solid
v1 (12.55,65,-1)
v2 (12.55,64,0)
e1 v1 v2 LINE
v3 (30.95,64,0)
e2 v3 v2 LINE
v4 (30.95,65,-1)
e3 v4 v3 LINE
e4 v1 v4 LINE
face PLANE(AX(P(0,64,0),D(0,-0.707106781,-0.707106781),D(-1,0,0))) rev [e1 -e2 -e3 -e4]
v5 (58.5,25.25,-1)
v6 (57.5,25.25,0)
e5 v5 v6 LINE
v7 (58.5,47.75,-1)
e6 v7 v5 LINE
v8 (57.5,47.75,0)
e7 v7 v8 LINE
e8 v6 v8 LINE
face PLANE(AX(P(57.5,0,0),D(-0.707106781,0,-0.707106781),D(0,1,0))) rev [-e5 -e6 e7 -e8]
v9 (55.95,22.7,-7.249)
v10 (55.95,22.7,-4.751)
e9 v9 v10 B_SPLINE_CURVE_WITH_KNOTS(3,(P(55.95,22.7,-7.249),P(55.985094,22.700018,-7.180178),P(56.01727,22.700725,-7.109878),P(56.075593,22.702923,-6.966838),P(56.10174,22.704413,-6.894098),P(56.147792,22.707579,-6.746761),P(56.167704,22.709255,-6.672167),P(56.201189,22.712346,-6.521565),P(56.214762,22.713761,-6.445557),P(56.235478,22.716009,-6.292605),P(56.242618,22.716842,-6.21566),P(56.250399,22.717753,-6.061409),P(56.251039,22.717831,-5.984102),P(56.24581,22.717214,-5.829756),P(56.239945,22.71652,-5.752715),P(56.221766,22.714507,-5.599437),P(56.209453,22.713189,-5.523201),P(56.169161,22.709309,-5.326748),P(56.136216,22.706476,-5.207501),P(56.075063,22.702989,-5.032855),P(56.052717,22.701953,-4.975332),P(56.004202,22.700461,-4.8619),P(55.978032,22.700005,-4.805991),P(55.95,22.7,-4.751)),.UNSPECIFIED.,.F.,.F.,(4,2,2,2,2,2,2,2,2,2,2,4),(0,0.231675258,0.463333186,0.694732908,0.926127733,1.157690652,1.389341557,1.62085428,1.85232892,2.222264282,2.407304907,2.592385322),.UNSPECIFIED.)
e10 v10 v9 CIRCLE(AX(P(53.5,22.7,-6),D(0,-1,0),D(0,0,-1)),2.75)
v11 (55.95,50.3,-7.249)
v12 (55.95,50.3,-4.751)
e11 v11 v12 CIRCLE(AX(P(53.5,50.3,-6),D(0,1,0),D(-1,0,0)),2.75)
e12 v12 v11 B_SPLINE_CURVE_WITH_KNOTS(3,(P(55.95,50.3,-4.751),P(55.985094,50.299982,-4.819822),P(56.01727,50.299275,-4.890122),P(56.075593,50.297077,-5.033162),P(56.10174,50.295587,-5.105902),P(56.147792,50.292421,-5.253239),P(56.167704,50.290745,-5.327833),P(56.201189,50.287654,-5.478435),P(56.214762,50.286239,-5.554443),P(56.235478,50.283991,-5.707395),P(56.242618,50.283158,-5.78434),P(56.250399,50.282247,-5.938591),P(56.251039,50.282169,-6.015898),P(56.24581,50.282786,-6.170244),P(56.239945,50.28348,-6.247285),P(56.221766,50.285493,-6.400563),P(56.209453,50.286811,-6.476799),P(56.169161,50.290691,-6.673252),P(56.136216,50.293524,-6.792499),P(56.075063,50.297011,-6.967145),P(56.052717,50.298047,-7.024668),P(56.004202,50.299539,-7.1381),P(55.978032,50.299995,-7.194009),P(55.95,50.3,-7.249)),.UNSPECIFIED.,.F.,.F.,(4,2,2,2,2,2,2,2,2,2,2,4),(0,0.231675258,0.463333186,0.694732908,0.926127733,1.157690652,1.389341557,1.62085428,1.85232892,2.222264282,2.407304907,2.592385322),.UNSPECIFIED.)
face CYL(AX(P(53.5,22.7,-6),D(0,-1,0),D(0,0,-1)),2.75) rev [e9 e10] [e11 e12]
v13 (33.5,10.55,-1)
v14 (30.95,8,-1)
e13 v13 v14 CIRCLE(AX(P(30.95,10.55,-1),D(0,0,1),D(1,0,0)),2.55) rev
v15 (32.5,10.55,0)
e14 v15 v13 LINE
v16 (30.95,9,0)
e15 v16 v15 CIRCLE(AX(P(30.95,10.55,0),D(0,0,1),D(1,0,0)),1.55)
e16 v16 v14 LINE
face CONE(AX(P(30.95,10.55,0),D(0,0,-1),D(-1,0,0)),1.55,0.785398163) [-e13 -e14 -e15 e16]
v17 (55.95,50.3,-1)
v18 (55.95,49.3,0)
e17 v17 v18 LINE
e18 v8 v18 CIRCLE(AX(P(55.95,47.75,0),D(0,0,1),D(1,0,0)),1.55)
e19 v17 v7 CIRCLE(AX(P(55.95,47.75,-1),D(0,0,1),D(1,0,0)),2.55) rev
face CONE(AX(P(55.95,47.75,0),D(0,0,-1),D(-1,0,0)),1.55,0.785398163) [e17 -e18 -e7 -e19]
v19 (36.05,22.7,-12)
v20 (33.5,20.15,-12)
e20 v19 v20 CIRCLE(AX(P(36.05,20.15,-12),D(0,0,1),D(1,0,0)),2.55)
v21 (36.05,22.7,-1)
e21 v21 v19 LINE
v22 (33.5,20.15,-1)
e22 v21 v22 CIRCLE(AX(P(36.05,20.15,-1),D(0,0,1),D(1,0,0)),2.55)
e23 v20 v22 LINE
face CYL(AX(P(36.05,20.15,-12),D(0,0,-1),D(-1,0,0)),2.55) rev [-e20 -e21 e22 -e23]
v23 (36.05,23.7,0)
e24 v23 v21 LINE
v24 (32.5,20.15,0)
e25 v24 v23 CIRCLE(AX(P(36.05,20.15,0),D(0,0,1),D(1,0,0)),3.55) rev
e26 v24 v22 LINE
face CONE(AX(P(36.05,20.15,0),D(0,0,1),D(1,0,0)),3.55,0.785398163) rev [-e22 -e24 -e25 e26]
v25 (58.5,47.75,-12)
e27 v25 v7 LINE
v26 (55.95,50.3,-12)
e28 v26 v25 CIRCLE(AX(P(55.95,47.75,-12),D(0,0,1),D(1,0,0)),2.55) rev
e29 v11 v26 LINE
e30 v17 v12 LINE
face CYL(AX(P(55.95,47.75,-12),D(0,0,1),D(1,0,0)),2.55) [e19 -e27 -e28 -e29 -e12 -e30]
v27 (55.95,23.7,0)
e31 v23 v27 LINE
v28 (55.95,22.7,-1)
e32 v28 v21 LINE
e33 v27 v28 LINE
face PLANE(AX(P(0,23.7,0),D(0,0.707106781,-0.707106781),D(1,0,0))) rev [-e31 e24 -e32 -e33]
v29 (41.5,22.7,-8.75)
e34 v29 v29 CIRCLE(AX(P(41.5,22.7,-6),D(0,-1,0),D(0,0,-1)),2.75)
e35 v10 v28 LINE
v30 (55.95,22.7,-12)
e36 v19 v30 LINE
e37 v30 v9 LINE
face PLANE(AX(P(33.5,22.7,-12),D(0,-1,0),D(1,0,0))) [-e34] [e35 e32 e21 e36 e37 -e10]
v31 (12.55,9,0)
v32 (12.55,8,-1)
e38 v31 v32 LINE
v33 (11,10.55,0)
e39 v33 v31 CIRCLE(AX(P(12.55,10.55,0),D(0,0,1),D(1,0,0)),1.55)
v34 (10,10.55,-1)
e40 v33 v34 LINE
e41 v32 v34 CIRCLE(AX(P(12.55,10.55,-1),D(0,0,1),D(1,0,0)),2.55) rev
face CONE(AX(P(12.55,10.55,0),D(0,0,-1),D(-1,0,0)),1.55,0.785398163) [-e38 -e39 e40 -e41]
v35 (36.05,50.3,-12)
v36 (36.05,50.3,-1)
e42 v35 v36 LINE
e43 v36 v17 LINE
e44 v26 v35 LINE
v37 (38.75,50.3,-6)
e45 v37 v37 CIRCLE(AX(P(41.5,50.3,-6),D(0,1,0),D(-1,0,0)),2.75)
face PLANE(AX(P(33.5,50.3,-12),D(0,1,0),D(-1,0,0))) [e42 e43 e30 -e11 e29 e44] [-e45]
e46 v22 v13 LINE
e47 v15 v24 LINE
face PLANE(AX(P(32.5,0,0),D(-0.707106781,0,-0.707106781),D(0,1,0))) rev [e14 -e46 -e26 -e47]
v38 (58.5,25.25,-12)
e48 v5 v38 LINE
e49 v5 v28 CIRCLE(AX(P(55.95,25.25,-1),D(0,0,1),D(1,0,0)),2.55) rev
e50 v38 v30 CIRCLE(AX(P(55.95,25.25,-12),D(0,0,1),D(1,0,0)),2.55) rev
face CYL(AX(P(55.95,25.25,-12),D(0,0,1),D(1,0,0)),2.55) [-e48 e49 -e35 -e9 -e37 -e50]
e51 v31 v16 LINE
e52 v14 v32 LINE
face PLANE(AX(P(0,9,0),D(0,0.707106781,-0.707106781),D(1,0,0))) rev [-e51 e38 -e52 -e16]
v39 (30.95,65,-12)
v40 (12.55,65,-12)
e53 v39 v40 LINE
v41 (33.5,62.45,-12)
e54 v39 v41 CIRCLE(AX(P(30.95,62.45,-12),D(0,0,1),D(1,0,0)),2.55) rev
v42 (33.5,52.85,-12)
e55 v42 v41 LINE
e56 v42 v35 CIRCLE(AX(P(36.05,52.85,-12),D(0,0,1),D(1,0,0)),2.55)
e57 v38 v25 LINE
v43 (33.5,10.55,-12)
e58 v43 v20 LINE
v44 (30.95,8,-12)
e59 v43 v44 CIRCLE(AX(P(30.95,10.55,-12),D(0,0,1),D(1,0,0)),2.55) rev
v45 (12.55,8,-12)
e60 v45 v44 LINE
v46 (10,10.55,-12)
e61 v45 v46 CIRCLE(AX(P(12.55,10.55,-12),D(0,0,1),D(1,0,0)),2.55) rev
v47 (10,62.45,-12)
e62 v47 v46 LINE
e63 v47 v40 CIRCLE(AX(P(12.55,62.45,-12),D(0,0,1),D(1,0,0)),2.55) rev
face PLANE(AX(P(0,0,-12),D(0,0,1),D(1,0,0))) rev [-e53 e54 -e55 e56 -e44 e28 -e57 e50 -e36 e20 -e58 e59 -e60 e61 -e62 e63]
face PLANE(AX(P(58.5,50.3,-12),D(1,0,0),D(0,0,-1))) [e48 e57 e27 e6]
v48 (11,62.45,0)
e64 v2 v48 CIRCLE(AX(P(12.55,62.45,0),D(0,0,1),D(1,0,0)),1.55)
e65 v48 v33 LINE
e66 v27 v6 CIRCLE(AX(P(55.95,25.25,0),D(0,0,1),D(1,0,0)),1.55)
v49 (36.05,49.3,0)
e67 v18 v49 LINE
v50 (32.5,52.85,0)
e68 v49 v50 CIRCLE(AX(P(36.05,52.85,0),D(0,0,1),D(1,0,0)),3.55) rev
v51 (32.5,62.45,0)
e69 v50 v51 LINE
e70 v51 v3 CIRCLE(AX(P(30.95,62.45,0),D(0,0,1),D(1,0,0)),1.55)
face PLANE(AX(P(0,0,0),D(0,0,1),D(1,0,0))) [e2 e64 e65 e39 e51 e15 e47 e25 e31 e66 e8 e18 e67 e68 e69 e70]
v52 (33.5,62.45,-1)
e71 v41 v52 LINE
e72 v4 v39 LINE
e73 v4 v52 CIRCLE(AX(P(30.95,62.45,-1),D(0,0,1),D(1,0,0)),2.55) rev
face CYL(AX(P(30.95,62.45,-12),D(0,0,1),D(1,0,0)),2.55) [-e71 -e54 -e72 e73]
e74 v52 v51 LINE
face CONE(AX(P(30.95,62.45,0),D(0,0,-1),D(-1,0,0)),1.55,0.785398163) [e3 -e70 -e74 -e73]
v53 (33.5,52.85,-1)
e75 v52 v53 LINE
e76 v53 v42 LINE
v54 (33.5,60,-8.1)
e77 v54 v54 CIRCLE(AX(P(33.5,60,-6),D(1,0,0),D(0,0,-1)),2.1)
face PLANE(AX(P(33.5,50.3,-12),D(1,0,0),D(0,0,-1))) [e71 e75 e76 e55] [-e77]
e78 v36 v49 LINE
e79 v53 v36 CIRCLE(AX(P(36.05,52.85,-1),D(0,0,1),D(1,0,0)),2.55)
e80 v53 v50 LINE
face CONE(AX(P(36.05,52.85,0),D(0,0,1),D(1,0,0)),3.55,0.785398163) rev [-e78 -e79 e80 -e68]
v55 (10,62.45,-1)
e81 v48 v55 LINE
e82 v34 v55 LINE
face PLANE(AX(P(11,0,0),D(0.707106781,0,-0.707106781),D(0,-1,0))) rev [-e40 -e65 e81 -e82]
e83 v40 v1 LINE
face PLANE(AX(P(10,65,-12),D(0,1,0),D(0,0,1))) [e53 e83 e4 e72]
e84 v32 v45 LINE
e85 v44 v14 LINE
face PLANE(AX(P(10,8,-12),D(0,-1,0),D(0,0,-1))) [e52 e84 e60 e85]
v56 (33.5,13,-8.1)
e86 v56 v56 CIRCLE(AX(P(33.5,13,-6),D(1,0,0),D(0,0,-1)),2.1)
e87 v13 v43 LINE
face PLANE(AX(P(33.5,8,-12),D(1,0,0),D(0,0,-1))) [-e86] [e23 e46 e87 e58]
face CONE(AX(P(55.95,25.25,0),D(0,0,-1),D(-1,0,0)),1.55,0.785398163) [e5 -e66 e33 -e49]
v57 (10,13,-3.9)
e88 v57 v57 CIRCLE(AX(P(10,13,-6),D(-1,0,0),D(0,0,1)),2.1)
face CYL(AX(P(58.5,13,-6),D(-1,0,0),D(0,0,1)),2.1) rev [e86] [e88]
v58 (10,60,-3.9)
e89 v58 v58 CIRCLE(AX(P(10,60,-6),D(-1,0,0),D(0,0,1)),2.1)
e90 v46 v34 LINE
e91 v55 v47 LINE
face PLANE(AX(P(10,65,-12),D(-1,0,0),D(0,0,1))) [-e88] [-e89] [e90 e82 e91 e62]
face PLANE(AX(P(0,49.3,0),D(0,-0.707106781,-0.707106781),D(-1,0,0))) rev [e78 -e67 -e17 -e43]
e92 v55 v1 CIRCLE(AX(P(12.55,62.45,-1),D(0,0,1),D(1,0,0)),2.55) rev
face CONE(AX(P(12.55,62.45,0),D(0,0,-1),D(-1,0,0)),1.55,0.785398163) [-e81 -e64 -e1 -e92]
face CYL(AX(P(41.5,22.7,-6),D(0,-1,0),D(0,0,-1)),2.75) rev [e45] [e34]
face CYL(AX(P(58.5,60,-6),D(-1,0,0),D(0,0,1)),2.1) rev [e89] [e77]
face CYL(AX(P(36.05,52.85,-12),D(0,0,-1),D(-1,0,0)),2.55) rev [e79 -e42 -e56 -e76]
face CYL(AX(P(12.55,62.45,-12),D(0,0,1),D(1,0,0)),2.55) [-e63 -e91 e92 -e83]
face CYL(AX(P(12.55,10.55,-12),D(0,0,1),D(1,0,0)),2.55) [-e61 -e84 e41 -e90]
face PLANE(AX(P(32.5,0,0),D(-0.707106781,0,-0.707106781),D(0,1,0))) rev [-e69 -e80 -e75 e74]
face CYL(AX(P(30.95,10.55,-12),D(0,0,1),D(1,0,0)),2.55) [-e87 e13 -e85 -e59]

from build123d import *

# Parameters (mm, degrees)
BOSS_EXTRUDE1_DEPTH      = 12
SKETCH2_R                = 2.1
CUT_EXTRUDE1_DEPTH       = 82.983229992
M5_CLEARANCE_HOLE1_D     = 5.5
M5_CLEARANCE_HOLE1_DEPTH = 28.347633298
M5_CLEARANCE_HOLE1_TIP   = 1.652366702
FILLET1_R                = 2.55
CHAMFER1_SIZE            = 1


with BuildPart() as part:
    # Sketch1 → Boss-Extrude1 (new body)
    with BuildSketch(Plane.XY):
        Polygon((10, 65), (10, 8), (33.5, 8), (33.5, 22.7), (58.5, 22.7), (58.5, 50.3), (33.5, 50.3), (33.5, 65), align=None)
    extrude(amount=-BOSS_EXTRUDE1_DEPTH)

    # Sketch2 → Cut-Extrude1 (cut, through all)
    with BuildSketch(Plane.ZY.offset(-10)):
        with Locations((-6, 13)):
            Circle(SKETCH2_R)
        with Locations((-6, 60)):
            Circle(SKETCH2_R)
    extrude(amount=-CUT_EXTRUDE1_DEPTH, mode=Mode.SUBTRACT)

    # M5 Clearance Hole1
    with Locations(Plane(origin=(0, 22.7, 0), x_dir=(-1, 0, 0), z_dir=(0, -1, 0))):
        with Locations((-53.5, 6), (-41.5, 6)):
            Hole(M5_CLEARANCE_HOLE1_D / 2, depth=M5_CLEARANCE_HOLE1_DEPTH)
            with Locations((0, 0, -(M5_CLEARANCE_HOLE1_DEPTH + M5_CLEARANCE_HOLE1_TIP / 2))):  # 118° drill point
                Cone(0, M5_CLEARANCE_HOLE1_D / 2, M5_CLEARANCE_HOLE1_TIP, mode=Mode.SUBTRACT)

    # Fillet1
    # the kernel refuses this fillet: 2.55 mm, written as the material it adds along each edge
    with BuildSketch(Plane(origin=(33.5, 50.3, 0), x_dir=(0, 1, 0), z_dir=(0, 0, -1))) as fillet1_piece_1:
        with BuildLine():
            CenterArc((FILLET1_R, FILLET1_R), FILLET1_R, 180, 90)
            Line((0, FILLET1_R), (0, 0))
            Line((0, 0), (FILLET1_R, 0))
        make_face()
    extrude(amount=12)
    with BuildSketch(Plane(origin=(33.5, 22.7, 0), x_dir=(0, -1, 0), z_dir=(0, 0, -1))) as fillet1_piece_2:
        with BuildLine():
            CenterArc((FILLET1_R, -FILLET1_R), FILLET1_R, 90, 90)
            Line((0, -FILLET1_R), (0, 0))
            Line((0, 0), (FILLET1_R, 0))
        make_face()
    extrude(amount=12)
    # the kernel refuses this fillet: 2.55 mm, written as the material it takes off along each edge
    with BuildSketch(Plane(origin=(33.5, 65, 6.375), x_dir=(-1, 0, 0), z_dir=(0, 0, -1)), Plane(origin=(10, 65, 6.375), x_dir=(0, -1, 0), z_dir=(0, 0, -1))) as fillet1_2_piece_1:
        with BuildLine():
            CenterArc((FILLET1_R, -FILLET1_R), FILLET1_R, 90, 90)
            Line((0, -FILLET1_R), (0, 0))
            Line((0, 0), (FILLET1_R, 0))
        make_face()
    extrude(amount=24.75, mode=Mode.SUBTRACT)
    with BuildSketch(Plane(origin=(58.5, 50.3, 6.375), x_dir=(0, -1, 0), z_dir=(0, 0, -1)), Plane(origin=(58.5, 22.7, 6.375), x_dir=(-1, 0, 0), z_dir=(0, 0, -1)), Plane(origin=(33.5, 8, 6.375), x_dir=(-1, 0, 0), z_dir=(0, 0, -1)), Plane(origin=(10, 8, 6.375), x_dir=(0, 1, 0), z_dir=(0, 0, -1))) as fillet1_2_piece_2:
        with BuildLine():
            CenterArc((FILLET1_R, FILLET1_R), FILLET1_R, 180, 90)
            Line((0, FILLET1_R), (0, 0))
            Line((0, 0), (FILLET1_R, 0))
        make_face()
    extrude(amount=24.75, mode=Mode.SUBTRACT)

    # Chamfer1
    chamfer1_edges = [part.edges().sort_by_distance(p)[0] for p in [
        (58.5, 36.5, 0),
        (21.75, 65, 0),
        (10, 36.5, 0),
        (21.75, 8, 0),
        (33.5, 15.35, 0),
        (46, 22.7, 0),
        (46, 50.3, 0),
        (33.5, 57.65, 0),
        (57.753122292, 23.446877708, 0),
        (32.753122292, 8.746877708, 0),
        (10.746877708, 8.746877708, 0),
        (10.746877708, 64.253122292, 0),
        (32.753122292, 64.253122292, 0),
        (57.753122292, 49.553122292, 0),
        (34.246877708, 51.046877708, 0),
        (34.246877708, 21.953122292, 0),
    ]]
    chamfer(chamfer1_edges, length=CHAMFER1_SIZE)


solid = part.part
